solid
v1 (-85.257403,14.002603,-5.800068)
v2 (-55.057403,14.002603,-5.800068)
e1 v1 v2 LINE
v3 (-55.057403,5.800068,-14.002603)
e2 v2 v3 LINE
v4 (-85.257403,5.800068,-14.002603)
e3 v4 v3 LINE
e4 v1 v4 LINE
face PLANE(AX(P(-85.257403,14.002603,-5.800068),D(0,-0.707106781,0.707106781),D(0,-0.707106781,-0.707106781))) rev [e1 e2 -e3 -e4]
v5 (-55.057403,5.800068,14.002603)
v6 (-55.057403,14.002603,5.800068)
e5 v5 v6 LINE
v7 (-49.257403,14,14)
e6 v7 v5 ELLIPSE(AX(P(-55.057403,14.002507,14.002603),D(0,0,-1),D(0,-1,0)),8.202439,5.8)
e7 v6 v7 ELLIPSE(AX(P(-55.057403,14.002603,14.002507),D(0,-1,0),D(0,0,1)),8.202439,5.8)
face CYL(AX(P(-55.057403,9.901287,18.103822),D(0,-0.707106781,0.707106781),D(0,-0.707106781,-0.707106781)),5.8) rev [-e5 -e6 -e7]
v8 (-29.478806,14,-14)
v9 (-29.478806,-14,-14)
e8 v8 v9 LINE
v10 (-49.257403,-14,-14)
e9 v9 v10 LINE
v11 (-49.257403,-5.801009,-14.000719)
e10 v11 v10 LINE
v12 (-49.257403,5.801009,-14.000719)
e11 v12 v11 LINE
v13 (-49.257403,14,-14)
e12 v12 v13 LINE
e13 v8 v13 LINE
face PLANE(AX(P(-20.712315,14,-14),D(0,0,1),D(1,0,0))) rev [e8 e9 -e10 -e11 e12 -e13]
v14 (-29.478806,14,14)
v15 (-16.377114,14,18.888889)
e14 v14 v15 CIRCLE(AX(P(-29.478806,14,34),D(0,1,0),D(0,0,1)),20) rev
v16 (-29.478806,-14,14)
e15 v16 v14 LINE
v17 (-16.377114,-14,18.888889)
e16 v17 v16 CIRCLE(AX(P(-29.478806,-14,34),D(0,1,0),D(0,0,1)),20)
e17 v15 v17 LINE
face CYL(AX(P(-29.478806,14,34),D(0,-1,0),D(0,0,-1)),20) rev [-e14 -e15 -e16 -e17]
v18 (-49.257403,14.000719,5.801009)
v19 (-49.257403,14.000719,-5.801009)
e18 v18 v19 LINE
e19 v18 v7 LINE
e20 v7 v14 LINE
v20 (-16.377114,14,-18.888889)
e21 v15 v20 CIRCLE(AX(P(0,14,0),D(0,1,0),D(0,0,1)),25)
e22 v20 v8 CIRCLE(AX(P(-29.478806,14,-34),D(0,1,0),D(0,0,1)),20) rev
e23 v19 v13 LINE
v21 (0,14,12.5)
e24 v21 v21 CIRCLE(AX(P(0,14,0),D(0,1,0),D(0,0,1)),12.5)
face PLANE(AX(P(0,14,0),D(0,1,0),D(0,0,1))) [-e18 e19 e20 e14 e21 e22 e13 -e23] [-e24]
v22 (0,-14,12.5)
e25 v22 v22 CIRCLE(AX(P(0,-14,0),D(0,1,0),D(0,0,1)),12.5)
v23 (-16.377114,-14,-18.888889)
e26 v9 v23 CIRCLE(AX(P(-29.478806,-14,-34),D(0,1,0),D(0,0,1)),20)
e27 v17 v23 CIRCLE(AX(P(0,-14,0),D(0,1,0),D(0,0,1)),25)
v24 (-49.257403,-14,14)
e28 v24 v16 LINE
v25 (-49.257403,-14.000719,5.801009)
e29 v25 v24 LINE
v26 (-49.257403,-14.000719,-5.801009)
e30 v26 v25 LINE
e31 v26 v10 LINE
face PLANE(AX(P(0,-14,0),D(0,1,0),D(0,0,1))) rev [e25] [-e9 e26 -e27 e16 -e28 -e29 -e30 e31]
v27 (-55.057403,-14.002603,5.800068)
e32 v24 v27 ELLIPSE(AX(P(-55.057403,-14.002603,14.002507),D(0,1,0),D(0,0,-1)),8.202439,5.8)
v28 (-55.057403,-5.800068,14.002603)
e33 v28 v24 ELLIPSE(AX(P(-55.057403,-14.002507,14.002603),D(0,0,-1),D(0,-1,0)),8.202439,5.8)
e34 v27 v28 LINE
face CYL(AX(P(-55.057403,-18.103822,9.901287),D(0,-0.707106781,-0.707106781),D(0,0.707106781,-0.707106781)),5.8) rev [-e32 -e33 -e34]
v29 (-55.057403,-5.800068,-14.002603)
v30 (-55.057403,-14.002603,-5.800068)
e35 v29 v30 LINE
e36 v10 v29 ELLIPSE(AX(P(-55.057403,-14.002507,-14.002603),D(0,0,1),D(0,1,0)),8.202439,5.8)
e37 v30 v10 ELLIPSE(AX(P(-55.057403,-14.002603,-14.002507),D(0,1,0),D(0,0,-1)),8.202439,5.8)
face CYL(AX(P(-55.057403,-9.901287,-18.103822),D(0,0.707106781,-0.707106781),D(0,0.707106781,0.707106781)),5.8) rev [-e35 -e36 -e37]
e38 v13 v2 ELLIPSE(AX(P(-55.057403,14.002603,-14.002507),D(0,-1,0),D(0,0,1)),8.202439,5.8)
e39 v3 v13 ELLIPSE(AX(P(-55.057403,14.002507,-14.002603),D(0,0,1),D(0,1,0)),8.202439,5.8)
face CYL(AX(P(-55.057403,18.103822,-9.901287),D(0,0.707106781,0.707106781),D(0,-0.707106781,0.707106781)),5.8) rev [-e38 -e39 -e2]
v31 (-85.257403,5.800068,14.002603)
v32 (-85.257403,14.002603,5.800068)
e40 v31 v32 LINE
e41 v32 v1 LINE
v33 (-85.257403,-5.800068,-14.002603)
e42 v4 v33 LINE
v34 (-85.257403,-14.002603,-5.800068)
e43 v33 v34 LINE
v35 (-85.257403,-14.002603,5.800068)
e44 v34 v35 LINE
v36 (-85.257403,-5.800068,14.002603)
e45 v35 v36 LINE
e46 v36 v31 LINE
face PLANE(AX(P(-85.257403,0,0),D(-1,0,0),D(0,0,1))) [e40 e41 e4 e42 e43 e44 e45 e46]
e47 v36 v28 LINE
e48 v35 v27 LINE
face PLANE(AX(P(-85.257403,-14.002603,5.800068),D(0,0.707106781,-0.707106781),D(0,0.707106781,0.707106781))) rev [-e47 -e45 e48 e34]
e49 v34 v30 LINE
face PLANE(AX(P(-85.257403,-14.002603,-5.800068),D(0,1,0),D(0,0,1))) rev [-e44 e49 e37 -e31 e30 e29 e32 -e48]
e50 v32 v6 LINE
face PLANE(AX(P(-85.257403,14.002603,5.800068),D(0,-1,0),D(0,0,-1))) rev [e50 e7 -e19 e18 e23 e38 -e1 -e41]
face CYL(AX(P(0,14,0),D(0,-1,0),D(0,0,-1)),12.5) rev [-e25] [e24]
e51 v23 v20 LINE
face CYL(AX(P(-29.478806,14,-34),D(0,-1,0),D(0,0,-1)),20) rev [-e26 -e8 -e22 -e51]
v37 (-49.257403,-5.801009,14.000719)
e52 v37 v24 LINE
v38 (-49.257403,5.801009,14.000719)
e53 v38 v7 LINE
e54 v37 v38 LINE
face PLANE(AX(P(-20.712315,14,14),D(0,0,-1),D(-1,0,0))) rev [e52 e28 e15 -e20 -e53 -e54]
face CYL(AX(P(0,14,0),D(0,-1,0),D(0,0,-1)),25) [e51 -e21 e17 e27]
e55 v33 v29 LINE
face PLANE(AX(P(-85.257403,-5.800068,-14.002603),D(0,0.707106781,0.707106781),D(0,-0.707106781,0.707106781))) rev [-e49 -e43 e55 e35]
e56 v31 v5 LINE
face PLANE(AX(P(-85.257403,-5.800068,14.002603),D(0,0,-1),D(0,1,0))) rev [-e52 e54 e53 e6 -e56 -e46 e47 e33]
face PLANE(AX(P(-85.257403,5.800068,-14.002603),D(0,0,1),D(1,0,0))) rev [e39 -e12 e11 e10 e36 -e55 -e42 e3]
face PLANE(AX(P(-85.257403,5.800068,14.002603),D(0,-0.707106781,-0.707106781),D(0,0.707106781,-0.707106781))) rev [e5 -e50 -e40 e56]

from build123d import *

# Parameters (mm, degrees)
CROQUIS1_R              = 12.5
SALIENTE_EXTRUIR1_DEPTH = 14
SALIENTE_EXTRUIR2_DEPTH = 36
REDONDEO1_R             = 5.8
REDONDEO2_R             = 20


with BuildPart() as part:
    # Croquis1 → Saliente-Extruir1 (new, symmetric)
    with BuildSketch(Plane(origin=(0, 0, 0), x_dir=(1, 0, 0), z_dir=(0, 1, 0))):
        with BuildLine():
            Line((-20.712315177, 14), (-49.257403189, 14))
            Line((-49.257403189, 14), (-49.257403189, -14))
            Line((-49.257403189, -14), (-20.712315177, -14))
            ThreePointArc((-20.712315177, -14), (25, 0), (-20.712315177, 14))
        make_face()
        with Locations(Location((0, 0, 0), (0, 0, 270))):
            Circle(CROQUIS1_R, mode=Mode.SUBTRACT)
    extrude(amount=SALIENTE_EXTRUIR1_DEPTH, both=True)

    # Croquis2 → Saliente-Extruir2 (add)
    with BuildSketch(Plane.ZY.offset(49.257403189)):
        Polygon((5.800067886, 14.002602553), (-5.800067886, 14.002602553), (-14.002602553, 5.800067886), (-14.002602553, -5.800067886), (-5.800067886, -14.002602553), (5.800067886, -14.002602553), (14.002602553, -5.800067886), (14.002602553, 5.800067886), align=None)
    extrude(amount=SALIENTE_EXTRUIR2_DEPTH)

    # Redondeo1
    # the kernel refuses this fillet: 5.8 mm, written as the material it adds along each edge
    with BuildSketch(Plane(origin=(-49.257403189, 4.450377888, -24.253048327), x_dir=(-1.2250736823450002e-15, -0.7071067811865477, -0.7071067811865472), z_dir=(0, -0.7071067811865472, 0.7071067811865478))) as redondeo1_piece_1_section:
        with BuildLine():
            CenterArc((REDONDEO1_R, -REDONDEO1_R), REDONDEO1_R, 90, 90)
            Line((0, -REDONDEO1_R), (0, 0))
            Line((0, 0), (REDONDEO1_R, 0))
        make_face()
    redondeo1_piece_1 = extrude(amount=40.59277464, mode=Mode.PRIVATE)
    redondeo1_piece_1 = split(redondeo1_piece_1, bisect_by=Plane(origin=(-50.689719309, -7.470344952, -14), z_dir=(0, 0, -1)), keep=Keep.TOP, mode=Mode.PRIVATE)
    redondeo1_piece_1 = split(redondeo1_piece_1, bisect_by=Plane(origin=(-50.689719309, -14, -14.001301277), z_dir=(0, 1, 0)), keep=Keep.TOP, mode=Mode.PRIVATE)
    redondeo1_piece_1 = split(redondeo1_piece_1, bisect_by=Plane(origin=(-49.257403189, -7.470344952, -14.001301277), z_dir=(-1, 0, 0)), keep=Keep.TOP, mode=Mode.PRIVATE)
    redondeo1_piece_1 = split(redondeo1_piece_1, bisect_by=Plane(origin=(-50.689719309, -7.470344952, -14.002602553), z_dir=(0, 0, 1)), keep=Keep.TOP, mode=Mode.PRIVATE)
    add(redondeo1_piece_1)
    with BuildSketch(Plane(origin=(-49.257403189, 4.450377888, -24.253048327), x_dir=(-1.2250736823450002e-15, -0.7071067811865477, -0.7071067811865472), z_dir=(0, -0.7071067811865472, 0.7071067811865478))) as redondeo1_piece_2_section:
        with BuildLine():
            CenterArc((REDONDEO1_R, -REDONDEO1_R), REDONDEO1_R, 90, 90)
            Line((0, -REDONDEO1_R), (0, 0))
            Line((0, 0), (REDONDEO1_R, 0))
        make_face()
    redondeo1_piece_2 = extrude(amount=40.59277464, mode=Mode.PRIVATE)
    redondeo1_piece_2 = split(redondeo1_piece_2, bisect_by=Plane(origin=(-50.864282471, -10.548199543, -14), z_dir=(0, 0, 1)), keep=Keep.TOP, mode=Mode.PRIVATE)
    redondeo1_piece_2 = split(redondeo1_piece_2, bisect_by=Plane(origin=(-50.864282471, -14, -10.548199543), z_dir=(0, 1, 0)), keep=Keep.TOP, mode=Mode.PRIVATE)
    redondeo1_piece_2 = split(redondeo1_piece_2, bisect_by=Plane(origin=(-49.257403189, -10.548199543, -10.548199543), z_dir=(-1, 0, 0)), keep=Keep.TOP, mode=Mode.PRIVATE)
    add(redondeo1_piece_2)
    with BuildSketch(Plane(origin=(-49.257403189, 4.450377888, -24.253048327), x_dir=(-1.2250736823450002e-15, -0.7071067811865477, -0.7071067811865472), z_dir=(0, -0.7071067811865472, 0.7071067811865478))) as redondeo1_piece_3_section:
        with BuildLine():
            CenterArc((REDONDEO1_R, -REDONDEO1_R), REDONDEO1_R, 90, 90)
            Line((0, -REDONDEO1_R), (0, 0))
            Line((0, 0), (REDONDEO1_R, 0))
        make_face()
    redondeo1_piece_3 = extrude(amount=40.59277464, mode=Mode.PRIVATE)
    redondeo1_piece_3 = split(redondeo1_piece_3, bisect_by=Plane(origin=(-50.68971928, -14.001301277, -14), z_dir=(0, 0, 1)), keep=Keep.TOP, mode=Mode.PRIVATE)
    redondeo1_piece_3 = split(redondeo1_piece_3, bisect_by=Plane(origin=(-50.68971928, -14, -7.470345028), z_dir=(0, -1, 0)), keep=Keep.TOP, mode=Mode.PRIVATE)
    redondeo1_piece_3 = split(redondeo1_piece_3, bisect_by=Plane(origin=(-49.257403189, -14.001301277, -7.470345028), z_dir=(-1, 0, 0)), keep=Keep.TOP, mode=Mode.PRIVATE)
    redondeo1_piece_3 = split(redondeo1_piece_3, bisect_by=Plane(origin=(-50.68971928, -14.002602553, -7.470345028), z_dir=(0, 1, 0)), keep=Keep.TOP, mode=Mode.PRIVATE)
    add(redondeo1_piece_3)
    with BuildSketch(Plane(origin=(-49.257403189, -24.253048327, -4.450377888), x_dir=(0, -0.7071067811865475, 0.7071067811865475), z_dir=(0, 0.7071067811865476, 0.7071067811865475))) as redondeo1_piece_4_section:
        with BuildLine():
            CenterArc((REDONDEO1_R, -REDONDEO1_R), REDONDEO1_R, 90, 90)
            Line((0, -REDONDEO1_R), (0, 0))
            Line((0, 0), (REDONDEO1_R, 0))
        make_face()
    redondeo1_piece_4 = extrude(amount=40.59277464, mode=Mode.PRIVATE)
    redondeo1_piece_4 = split(redondeo1_piece_4, bisect_by=Plane(origin=(-50.68971931, -14, 7.470344956), z_dir=(0, -1, 0)), keep=Keep.TOP, mode=Mode.PRIVATE)
    redondeo1_piece_4 = split(redondeo1_piece_4, bisect_by=Plane(origin=(-49.257403189, -14.001301277, 7.470344956), z_dir=(-1, 0, 0)), keep=Keep.TOP, mode=Mode.PRIVATE)
    redondeo1_piece_4 = split(redondeo1_piece_4, bisect_by=Plane(origin=(-50.68971931, -14.001301277, 14), z_dir=(0, 0, -1)), keep=Keep.TOP, mode=Mode.PRIVATE)
    redondeo1_piece_4 = split(redondeo1_piece_4, bisect_by=Plane(origin=(-50.68971931, -14.002602553, 7.470344956), z_dir=(0, 1, 0)), keep=Keep.TOP, mode=Mode.PRIVATE)
    add(redondeo1_piece_4)
    with BuildSketch(Plane(origin=(-49.257403189, -24.253048327, -4.450377888), x_dir=(0, -0.7071067811865475, 0.7071067811865475), z_dir=(0, 0.7071067811865476, 0.7071067811865475))) as redondeo1_piece_5_section:
        with BuildLine():
            CenterArc((REDONDEO1_R, -REDONDEO1_R), REDONDEO1_R, 90, 90)
            Line((0, -REDONDEO1_R), (0, 0))
            Line((0, 0), (REDONDEO1_R, 0))
        make_face()
    redondeo1_piece_5 = extrude(amount=40.59277464, mode=Mode.PRIVATE)
    redondeo1_piece_5 = split(redondeo1_piece_5, bisect_by=Plane(origin=(-50.864282471, -14, 10.548199543), z_dir=(0, 1, 0)), keep=Keep.TOP, mode=Mode.PRIVATE)
    redondeo1_piece_5 = split(redondeo1_piece_5, bisect_by=Plane(origin=(-49.257403189, -10.548199543, 10.548199543), z_dir=(-1, 0, 0)), keep=Keep.TOP, mode=Mode.PRIVATE)
    redondeo1_piece_5 = split(redondeo1_piece_5, bisect_by=Plane(origin=(-50.864282471, -10.548199543, 14), z_dir=(0, 0, -1)), keep=Keep.TOP, mode=Mode.PRIVATE)
    add(redondeo1_piece_5)
    with BuildSketch(Plane(origin=(-49.257403189, -24.253048327, -4.450377888), x_dir=(0, -0.7071067811865475, 0.7071067811865475), z_dir=(0, 0.7071067811865476, 0.7071067811865475))) as redondeo1_piece_6_section:
        with BuildLine():
            CenterArc((REDONDEO1_R, -REDONDEO1_R), REDONDEO1_R, 90, 90)
            Line((0, -REDONDEO1_R), (0, 0))
            Line((0, 0), (REDONDEO1_R, 0))
        make_face()
    redondeo1_piece_6 = extrude(amount=40.59277464, mode=Mode.PRIVATE)
    redondeo1_piece_6 = split(redondeo1_piece_6, bisect_by=Plane(origin=(-50.689719279, -14, 14.001301277), z_dir=(0, 1, 0)), keep=Keep.TOP, mode=Mode.PRIVATE)
    redondeo1_piece_6 = split(redondeo1_piece_6, bisect_by=Plane(origin=(-49.257403189, -7.470345026, 14.001301277), z_dir=(-1, 0, 0)), keep=Keep.TOP, mode=Mode.PRIVATE)
    redondeo1_piece_6 = split(redondeo1_piece_6, bisect_by=Plane(origin=(-50.689719279, -7.470345026, 14), z_dir=(0, 0, 1)), keep=Keep.TOP, mode=Mode.PRIVATE)
    redondeo1_piece_6 = split(redondeo1_piece_6, bisect_by=Plane(origin=(-50.689719279, -7.470345026, 14.002602553), z_dir=(0, 0, -1)), keep=Keep.TOP, mode=Mode.PRIVATE)
    add(redondeo1_piece_6)
    with BuildSketch(Plane(origin=(-49.257403189, 24.253048327, 4.450377888), x_dir=(0, 0.7071067811865474, -0.7071067811865477), z_dir=(0, -0.7071067811865478, -0.7071067811865474))) as redondeo1_piece_7_section:
        with BuildLine():
            CenterArc((REDONDEO1_R, -REDONDEO1_R), REDONDEO1_R, 90, 90)
            Line((0, -REDONDEO1_R), (0, 0))
            Line((0, 0), (REDONDEO1_R, 0))
        make_face()
    redondeo1_piece_7 = extrude(amount=40.59277464, mode=Mode.PRIVATE)
    redondeo1_piece_7 = split(redondeo1_piece_7, bisect_by=Plane(origin=(-50.689719309, 14.001301277, -14), z_dir=(0, 0, 1)), keep=Keep.TOP, mode=Mode.PRIVATE)
    redondeo1_piece_7 = split(redondeo1_piece_7, bisect_by=Plane(origin=(-49.257403189, 14.001301277, -7.470344953), z_dir=(-1, 0, 0)), keep=Keep.TOP, mode=Mode.PRIVATE)
    redondeo1_piece_7 = split(redondeo1_piece_7, bisect_by=Plane(origin=(-50.689719309, 14, -7.470344953), z_dir=(0, 1, 0)), keep=Keep.TOP, mode=Mode.PRIVATE)
    redondeo1_piece_7 = split(redondeo1_piece_7, bisect_by=Plane(origin=(-50.689719309, 14.002602553, -7.470344953), z_dir=(0, -1, 0)), keep=Keep.TOP, mode=Mode.PRIVATE)
    add(redondeo1_piece_7)
    with BuildSketch(Plane(origin=(-49.257403189, 24.253048327, 4.450377888), x_dir=(0, 0.7071067811865474, -0.7071067811865477), z_dir=(0, -0.7071067811865478, -0.7071067811865474))) as redondeo1_piece_8_section:
        with BuildLine():
            CenterArc((REDONDEO1_R, -REDONDEO1_R), REDONDEO1_R, 90, 90)
            Line((0, -REDONDEO1_R), (0, 0))
            Line((0, 0), (REDONDEO1_R, 0))
        make_face()
    redondeo1_piece_8 = extrude(amount=40.59277464, mode=Mode.PRIVATE)
    redondeo1_piece_8 = split(redondeo1_piece_8, bisect_by=Plane(origin=(-50.864282471, 10.548199543, -14), z_dir=(0, 0, 1)), keep=Keep.TOP, mode=Mode.PRIVATE)
    redondeo1_piece_8 = split(redondeo1_piece_8, bisect_by=Plane(origin=(-49.257403189, 10.548199543, -10.548199543), z_dir=(-1, 0, 0)), keep=Keep.TOP, mode=Mode.PRIVATE)
    redondeo1_piece_8 = split(redondeo1_piece_8, bisect_by=Plane(origin=(-50.864282471, 14, -10.548199543), z_dir=(0, -1, 0)), keep=Keep.TOP, mode=Mode.PRIVATE)
    add(redondeo1_piece_8)
    with BuildSketch(Plane(origin=(-49.257403189, 24.253048327, 4.450377888), x_dir=(0, 0.7071067811865474, -0.7071067811865477), z_dir=(0, -0.7071067811865478, -0.7071067811865474))) as redondeo1_piece_9_section:
        with BuildLine():
            CenterArc((REDONDEO1_R, -REDONDEO1_R), REDONDEO1_R, 90, 90)
            Line((0, -REDONDEO1_R), (0, 0))
            Line((0, 0), (REDONDEO1_R, 0))
        make_face()
    redondeo1_piece_9 = extrude(amount=40.59277464, mode=Mode.PRIVATE)
    redondeo1_piece_9 = split(redondeo1_piece_9, bisect_by=Plane(origin=(-50.689719282, 7.470345028, -14), z_dir=(0, 0, -1)), keep=Keep.TOP, mode=Mode.PRIVATE)
    redondeo1_piece_9 = split(redondeo1_piece_9, bisect_by=Plane(origin=(-49.257403189, 7.470345028, -14.001301277), z_dir=(-1, 0, 0)), keep=Keep.TOP, mode=Mode.PRIVATE)
    redondeo1_piece_9 = split(redondeo1_piece_9, bisect_by=Plane(origin=(-50.689719282, 14, -14.001301277), z_dir=(0, -1, 0)), keep=Keep.TOP, mode=Mode.PRIVATE)
    redondeo1_piece_9 = split(redondeo1_piece_9, bisect_by=Plane(origin=(-50.689719282, 7.470345028, -14.002602553), z_dir=(0, 0, 1)), keep=Keep.TOP, mode=Mode.PRIVATE)
    add(redondeo1_piece_9)
    with BuildSketch(Plane(origin=(-49.257403189, -4.450377888, 24.253048327), x_dir=(1.2250736823450004e-15, 0.7071067811865477, 0.7071067811865474), z_dir=(0, 0.7071067811865474, -0.7071067811865478))) as redondeo1_piece_10_section:
        with BuildLine():
            CenterArc((REDONDEO1_R, -REDONDEO1_R), REDONDEO1_R, 90, 90)
            Line((0, -REDONDEO1_R), (0, 0))
            Line((0, 0), (REDONDEO1_R, 0))
        make_face()
    redondeo1_piece_10 = extrude(amount=40.59277464, mode=Mode.PRIVATE)
    redondeo1_piece_10 = split(redondeo1_piece_10, bisect_by=Plane(origin=(-50.68971931, 14, 14.001301277), z_dir=(0, -1, 0)), keep=Keep.TOP, mode=Mode.PRIVATE)
    redondeo1_piece_10 = split(redondeo1_piece_10, bisect_by=Plane(origin=(-50.68971931, 7.470344952, 14), z_dir=(0, 0, 1)), keep=Keep.TOP, mode=Mode.PRIVATE)
    redondeo1_piece_10 = split(redondeo1_piece_10, bisect_by=Plane(origin=(-49.257403189, 7.470344952, 14.001301277), z_dir=(-1, 0, 0)), keep=Keep.TOP, mode=Mode.PRIVATE)
    redondeo1_piece_10 = split(redondeo1_piece_10, bisect_by=Plane(origin=(-50.68971931, 7.470344952, 14.002602553), z_dir=(0, 0, -1)), keep=Keep.TOP, mode=Mode.PRIVATE)
    add(redondeo1_piece_10)
    with BuildSketch(Plane(origin=(-49.257403189, -4.450377888, 24.253048327), x_dir=(1.2250736823450004e-15, 0.7071067811865477, 0.7071067811865474), z_dir=(0, 0.7071067811865474, -0.7071067811865478))) as redondeo1_piece_11_section:
        with BuildLine():
            CenterArc((REDONDEO1_R, -REDONDEO1_R), REDONDEO1_R, 90, 90)
            Line((0, -REDONDEO1_R), (0, 0))
            Line((0, 0), (REDONDEO1_R, 0))
        make_face()
    redondeo1_piece_11 = extrude(amount=40.59277464, mode=Mode.PRIVATE)
    redondeo1_piece_11 = split(redondeo1_piece_11, bisect_by=Plane(origin=(-50.864282471, 14, 10.548199543), z_dir=(0, -1, 0)), keep=Keep.TOP, mode=Mode.PRIVATE)
    redondeo1_piece_11 = split(redondeo1_piece_11, bisect_by=Plane(origin=(-50.864282471, 10.548199543, 14), z_dir=(0, 0, -1)), keep=Keep.TOP, mode=Mode.PRIVATE)
    redondeo1_piece_11 = split(redondeo1_piece_11, bisect_by=Plane(origin=(-49.257403189, 10.548199543, 10.548199543), z_dir=(-1, 0, 0)), keep=Keep.TOP, mode=Mode.PRIVATE)
    add(redondeo1_piece_11)
    with BuildSketch(Plane(origin=(-49.257403189, -4.450377888, 24.253048327), x_dir=(1.2250736823450004e-15, 0.7071067811865477, 0.7071067811865474), z_dir=(0, 0.7071067811865474, -0.7071067811865478))) as redondeo1_piece_12_section:
        with BuildLine():
            CenterArc((REDONDEO1_R, -REDONDEO1_R), REDONDEO1_R, 90, 90)
            Line((0, -REDONDEO1_R), (0, 0))
            Line((0, 0), (REDONDEO1_R, 0))
        make_face()
    redondeo1_piece_12 = extrude(amount=40.59277464, mode=Mode.PRIVATE)
    redondeo1_piece_12 = split(redondeo1_piece_12, bisect_by=Plane(origin=(-50.689719281, 14, 7.47034503), z_dir=(0, 1, 0)), keep=Keep.TOP, mode=Mode.PRIVATE)
    redondeo1_piece_12 = split(redondeo1_piece_12, bisect_by=Plane(origin=(-50.689719281, 14.001301277, 14), z_dir=(0, 0, -1)), keep=Keep.TOP, mode=Mode.PRIVATE)
    redondeo1_piece_12 = split(redondeo1_piece_12, bisect_by=Plane(origin=(-49.257403189, 14.001301277, 7.47034503), z_dir=(-1, 0, 0)), keep=Keep.TOP, mode=Mode.PRIVATE)
    redondeo1_piece_12 = split(redondeo1_piece_12, bisect_by=Plane(origin=(-50.689719281, 14.002602553, 7.47034503), z_dir=(0, -1, 0)), keep=Keep.TOP, mode=Mode.PRIVATE)
    add(redondeo1_piece_12)

    # Redondeo2
    redondeo2_edges = [part.edges().sort_by_distance(p)[0] for p in [
        (-20.712315177, 0, -14),
        (-20.712315177, 0, 14),
    ]]
    fillet(redondeo2_edges, radius=REDONDEO2_R)


solid = part.part
